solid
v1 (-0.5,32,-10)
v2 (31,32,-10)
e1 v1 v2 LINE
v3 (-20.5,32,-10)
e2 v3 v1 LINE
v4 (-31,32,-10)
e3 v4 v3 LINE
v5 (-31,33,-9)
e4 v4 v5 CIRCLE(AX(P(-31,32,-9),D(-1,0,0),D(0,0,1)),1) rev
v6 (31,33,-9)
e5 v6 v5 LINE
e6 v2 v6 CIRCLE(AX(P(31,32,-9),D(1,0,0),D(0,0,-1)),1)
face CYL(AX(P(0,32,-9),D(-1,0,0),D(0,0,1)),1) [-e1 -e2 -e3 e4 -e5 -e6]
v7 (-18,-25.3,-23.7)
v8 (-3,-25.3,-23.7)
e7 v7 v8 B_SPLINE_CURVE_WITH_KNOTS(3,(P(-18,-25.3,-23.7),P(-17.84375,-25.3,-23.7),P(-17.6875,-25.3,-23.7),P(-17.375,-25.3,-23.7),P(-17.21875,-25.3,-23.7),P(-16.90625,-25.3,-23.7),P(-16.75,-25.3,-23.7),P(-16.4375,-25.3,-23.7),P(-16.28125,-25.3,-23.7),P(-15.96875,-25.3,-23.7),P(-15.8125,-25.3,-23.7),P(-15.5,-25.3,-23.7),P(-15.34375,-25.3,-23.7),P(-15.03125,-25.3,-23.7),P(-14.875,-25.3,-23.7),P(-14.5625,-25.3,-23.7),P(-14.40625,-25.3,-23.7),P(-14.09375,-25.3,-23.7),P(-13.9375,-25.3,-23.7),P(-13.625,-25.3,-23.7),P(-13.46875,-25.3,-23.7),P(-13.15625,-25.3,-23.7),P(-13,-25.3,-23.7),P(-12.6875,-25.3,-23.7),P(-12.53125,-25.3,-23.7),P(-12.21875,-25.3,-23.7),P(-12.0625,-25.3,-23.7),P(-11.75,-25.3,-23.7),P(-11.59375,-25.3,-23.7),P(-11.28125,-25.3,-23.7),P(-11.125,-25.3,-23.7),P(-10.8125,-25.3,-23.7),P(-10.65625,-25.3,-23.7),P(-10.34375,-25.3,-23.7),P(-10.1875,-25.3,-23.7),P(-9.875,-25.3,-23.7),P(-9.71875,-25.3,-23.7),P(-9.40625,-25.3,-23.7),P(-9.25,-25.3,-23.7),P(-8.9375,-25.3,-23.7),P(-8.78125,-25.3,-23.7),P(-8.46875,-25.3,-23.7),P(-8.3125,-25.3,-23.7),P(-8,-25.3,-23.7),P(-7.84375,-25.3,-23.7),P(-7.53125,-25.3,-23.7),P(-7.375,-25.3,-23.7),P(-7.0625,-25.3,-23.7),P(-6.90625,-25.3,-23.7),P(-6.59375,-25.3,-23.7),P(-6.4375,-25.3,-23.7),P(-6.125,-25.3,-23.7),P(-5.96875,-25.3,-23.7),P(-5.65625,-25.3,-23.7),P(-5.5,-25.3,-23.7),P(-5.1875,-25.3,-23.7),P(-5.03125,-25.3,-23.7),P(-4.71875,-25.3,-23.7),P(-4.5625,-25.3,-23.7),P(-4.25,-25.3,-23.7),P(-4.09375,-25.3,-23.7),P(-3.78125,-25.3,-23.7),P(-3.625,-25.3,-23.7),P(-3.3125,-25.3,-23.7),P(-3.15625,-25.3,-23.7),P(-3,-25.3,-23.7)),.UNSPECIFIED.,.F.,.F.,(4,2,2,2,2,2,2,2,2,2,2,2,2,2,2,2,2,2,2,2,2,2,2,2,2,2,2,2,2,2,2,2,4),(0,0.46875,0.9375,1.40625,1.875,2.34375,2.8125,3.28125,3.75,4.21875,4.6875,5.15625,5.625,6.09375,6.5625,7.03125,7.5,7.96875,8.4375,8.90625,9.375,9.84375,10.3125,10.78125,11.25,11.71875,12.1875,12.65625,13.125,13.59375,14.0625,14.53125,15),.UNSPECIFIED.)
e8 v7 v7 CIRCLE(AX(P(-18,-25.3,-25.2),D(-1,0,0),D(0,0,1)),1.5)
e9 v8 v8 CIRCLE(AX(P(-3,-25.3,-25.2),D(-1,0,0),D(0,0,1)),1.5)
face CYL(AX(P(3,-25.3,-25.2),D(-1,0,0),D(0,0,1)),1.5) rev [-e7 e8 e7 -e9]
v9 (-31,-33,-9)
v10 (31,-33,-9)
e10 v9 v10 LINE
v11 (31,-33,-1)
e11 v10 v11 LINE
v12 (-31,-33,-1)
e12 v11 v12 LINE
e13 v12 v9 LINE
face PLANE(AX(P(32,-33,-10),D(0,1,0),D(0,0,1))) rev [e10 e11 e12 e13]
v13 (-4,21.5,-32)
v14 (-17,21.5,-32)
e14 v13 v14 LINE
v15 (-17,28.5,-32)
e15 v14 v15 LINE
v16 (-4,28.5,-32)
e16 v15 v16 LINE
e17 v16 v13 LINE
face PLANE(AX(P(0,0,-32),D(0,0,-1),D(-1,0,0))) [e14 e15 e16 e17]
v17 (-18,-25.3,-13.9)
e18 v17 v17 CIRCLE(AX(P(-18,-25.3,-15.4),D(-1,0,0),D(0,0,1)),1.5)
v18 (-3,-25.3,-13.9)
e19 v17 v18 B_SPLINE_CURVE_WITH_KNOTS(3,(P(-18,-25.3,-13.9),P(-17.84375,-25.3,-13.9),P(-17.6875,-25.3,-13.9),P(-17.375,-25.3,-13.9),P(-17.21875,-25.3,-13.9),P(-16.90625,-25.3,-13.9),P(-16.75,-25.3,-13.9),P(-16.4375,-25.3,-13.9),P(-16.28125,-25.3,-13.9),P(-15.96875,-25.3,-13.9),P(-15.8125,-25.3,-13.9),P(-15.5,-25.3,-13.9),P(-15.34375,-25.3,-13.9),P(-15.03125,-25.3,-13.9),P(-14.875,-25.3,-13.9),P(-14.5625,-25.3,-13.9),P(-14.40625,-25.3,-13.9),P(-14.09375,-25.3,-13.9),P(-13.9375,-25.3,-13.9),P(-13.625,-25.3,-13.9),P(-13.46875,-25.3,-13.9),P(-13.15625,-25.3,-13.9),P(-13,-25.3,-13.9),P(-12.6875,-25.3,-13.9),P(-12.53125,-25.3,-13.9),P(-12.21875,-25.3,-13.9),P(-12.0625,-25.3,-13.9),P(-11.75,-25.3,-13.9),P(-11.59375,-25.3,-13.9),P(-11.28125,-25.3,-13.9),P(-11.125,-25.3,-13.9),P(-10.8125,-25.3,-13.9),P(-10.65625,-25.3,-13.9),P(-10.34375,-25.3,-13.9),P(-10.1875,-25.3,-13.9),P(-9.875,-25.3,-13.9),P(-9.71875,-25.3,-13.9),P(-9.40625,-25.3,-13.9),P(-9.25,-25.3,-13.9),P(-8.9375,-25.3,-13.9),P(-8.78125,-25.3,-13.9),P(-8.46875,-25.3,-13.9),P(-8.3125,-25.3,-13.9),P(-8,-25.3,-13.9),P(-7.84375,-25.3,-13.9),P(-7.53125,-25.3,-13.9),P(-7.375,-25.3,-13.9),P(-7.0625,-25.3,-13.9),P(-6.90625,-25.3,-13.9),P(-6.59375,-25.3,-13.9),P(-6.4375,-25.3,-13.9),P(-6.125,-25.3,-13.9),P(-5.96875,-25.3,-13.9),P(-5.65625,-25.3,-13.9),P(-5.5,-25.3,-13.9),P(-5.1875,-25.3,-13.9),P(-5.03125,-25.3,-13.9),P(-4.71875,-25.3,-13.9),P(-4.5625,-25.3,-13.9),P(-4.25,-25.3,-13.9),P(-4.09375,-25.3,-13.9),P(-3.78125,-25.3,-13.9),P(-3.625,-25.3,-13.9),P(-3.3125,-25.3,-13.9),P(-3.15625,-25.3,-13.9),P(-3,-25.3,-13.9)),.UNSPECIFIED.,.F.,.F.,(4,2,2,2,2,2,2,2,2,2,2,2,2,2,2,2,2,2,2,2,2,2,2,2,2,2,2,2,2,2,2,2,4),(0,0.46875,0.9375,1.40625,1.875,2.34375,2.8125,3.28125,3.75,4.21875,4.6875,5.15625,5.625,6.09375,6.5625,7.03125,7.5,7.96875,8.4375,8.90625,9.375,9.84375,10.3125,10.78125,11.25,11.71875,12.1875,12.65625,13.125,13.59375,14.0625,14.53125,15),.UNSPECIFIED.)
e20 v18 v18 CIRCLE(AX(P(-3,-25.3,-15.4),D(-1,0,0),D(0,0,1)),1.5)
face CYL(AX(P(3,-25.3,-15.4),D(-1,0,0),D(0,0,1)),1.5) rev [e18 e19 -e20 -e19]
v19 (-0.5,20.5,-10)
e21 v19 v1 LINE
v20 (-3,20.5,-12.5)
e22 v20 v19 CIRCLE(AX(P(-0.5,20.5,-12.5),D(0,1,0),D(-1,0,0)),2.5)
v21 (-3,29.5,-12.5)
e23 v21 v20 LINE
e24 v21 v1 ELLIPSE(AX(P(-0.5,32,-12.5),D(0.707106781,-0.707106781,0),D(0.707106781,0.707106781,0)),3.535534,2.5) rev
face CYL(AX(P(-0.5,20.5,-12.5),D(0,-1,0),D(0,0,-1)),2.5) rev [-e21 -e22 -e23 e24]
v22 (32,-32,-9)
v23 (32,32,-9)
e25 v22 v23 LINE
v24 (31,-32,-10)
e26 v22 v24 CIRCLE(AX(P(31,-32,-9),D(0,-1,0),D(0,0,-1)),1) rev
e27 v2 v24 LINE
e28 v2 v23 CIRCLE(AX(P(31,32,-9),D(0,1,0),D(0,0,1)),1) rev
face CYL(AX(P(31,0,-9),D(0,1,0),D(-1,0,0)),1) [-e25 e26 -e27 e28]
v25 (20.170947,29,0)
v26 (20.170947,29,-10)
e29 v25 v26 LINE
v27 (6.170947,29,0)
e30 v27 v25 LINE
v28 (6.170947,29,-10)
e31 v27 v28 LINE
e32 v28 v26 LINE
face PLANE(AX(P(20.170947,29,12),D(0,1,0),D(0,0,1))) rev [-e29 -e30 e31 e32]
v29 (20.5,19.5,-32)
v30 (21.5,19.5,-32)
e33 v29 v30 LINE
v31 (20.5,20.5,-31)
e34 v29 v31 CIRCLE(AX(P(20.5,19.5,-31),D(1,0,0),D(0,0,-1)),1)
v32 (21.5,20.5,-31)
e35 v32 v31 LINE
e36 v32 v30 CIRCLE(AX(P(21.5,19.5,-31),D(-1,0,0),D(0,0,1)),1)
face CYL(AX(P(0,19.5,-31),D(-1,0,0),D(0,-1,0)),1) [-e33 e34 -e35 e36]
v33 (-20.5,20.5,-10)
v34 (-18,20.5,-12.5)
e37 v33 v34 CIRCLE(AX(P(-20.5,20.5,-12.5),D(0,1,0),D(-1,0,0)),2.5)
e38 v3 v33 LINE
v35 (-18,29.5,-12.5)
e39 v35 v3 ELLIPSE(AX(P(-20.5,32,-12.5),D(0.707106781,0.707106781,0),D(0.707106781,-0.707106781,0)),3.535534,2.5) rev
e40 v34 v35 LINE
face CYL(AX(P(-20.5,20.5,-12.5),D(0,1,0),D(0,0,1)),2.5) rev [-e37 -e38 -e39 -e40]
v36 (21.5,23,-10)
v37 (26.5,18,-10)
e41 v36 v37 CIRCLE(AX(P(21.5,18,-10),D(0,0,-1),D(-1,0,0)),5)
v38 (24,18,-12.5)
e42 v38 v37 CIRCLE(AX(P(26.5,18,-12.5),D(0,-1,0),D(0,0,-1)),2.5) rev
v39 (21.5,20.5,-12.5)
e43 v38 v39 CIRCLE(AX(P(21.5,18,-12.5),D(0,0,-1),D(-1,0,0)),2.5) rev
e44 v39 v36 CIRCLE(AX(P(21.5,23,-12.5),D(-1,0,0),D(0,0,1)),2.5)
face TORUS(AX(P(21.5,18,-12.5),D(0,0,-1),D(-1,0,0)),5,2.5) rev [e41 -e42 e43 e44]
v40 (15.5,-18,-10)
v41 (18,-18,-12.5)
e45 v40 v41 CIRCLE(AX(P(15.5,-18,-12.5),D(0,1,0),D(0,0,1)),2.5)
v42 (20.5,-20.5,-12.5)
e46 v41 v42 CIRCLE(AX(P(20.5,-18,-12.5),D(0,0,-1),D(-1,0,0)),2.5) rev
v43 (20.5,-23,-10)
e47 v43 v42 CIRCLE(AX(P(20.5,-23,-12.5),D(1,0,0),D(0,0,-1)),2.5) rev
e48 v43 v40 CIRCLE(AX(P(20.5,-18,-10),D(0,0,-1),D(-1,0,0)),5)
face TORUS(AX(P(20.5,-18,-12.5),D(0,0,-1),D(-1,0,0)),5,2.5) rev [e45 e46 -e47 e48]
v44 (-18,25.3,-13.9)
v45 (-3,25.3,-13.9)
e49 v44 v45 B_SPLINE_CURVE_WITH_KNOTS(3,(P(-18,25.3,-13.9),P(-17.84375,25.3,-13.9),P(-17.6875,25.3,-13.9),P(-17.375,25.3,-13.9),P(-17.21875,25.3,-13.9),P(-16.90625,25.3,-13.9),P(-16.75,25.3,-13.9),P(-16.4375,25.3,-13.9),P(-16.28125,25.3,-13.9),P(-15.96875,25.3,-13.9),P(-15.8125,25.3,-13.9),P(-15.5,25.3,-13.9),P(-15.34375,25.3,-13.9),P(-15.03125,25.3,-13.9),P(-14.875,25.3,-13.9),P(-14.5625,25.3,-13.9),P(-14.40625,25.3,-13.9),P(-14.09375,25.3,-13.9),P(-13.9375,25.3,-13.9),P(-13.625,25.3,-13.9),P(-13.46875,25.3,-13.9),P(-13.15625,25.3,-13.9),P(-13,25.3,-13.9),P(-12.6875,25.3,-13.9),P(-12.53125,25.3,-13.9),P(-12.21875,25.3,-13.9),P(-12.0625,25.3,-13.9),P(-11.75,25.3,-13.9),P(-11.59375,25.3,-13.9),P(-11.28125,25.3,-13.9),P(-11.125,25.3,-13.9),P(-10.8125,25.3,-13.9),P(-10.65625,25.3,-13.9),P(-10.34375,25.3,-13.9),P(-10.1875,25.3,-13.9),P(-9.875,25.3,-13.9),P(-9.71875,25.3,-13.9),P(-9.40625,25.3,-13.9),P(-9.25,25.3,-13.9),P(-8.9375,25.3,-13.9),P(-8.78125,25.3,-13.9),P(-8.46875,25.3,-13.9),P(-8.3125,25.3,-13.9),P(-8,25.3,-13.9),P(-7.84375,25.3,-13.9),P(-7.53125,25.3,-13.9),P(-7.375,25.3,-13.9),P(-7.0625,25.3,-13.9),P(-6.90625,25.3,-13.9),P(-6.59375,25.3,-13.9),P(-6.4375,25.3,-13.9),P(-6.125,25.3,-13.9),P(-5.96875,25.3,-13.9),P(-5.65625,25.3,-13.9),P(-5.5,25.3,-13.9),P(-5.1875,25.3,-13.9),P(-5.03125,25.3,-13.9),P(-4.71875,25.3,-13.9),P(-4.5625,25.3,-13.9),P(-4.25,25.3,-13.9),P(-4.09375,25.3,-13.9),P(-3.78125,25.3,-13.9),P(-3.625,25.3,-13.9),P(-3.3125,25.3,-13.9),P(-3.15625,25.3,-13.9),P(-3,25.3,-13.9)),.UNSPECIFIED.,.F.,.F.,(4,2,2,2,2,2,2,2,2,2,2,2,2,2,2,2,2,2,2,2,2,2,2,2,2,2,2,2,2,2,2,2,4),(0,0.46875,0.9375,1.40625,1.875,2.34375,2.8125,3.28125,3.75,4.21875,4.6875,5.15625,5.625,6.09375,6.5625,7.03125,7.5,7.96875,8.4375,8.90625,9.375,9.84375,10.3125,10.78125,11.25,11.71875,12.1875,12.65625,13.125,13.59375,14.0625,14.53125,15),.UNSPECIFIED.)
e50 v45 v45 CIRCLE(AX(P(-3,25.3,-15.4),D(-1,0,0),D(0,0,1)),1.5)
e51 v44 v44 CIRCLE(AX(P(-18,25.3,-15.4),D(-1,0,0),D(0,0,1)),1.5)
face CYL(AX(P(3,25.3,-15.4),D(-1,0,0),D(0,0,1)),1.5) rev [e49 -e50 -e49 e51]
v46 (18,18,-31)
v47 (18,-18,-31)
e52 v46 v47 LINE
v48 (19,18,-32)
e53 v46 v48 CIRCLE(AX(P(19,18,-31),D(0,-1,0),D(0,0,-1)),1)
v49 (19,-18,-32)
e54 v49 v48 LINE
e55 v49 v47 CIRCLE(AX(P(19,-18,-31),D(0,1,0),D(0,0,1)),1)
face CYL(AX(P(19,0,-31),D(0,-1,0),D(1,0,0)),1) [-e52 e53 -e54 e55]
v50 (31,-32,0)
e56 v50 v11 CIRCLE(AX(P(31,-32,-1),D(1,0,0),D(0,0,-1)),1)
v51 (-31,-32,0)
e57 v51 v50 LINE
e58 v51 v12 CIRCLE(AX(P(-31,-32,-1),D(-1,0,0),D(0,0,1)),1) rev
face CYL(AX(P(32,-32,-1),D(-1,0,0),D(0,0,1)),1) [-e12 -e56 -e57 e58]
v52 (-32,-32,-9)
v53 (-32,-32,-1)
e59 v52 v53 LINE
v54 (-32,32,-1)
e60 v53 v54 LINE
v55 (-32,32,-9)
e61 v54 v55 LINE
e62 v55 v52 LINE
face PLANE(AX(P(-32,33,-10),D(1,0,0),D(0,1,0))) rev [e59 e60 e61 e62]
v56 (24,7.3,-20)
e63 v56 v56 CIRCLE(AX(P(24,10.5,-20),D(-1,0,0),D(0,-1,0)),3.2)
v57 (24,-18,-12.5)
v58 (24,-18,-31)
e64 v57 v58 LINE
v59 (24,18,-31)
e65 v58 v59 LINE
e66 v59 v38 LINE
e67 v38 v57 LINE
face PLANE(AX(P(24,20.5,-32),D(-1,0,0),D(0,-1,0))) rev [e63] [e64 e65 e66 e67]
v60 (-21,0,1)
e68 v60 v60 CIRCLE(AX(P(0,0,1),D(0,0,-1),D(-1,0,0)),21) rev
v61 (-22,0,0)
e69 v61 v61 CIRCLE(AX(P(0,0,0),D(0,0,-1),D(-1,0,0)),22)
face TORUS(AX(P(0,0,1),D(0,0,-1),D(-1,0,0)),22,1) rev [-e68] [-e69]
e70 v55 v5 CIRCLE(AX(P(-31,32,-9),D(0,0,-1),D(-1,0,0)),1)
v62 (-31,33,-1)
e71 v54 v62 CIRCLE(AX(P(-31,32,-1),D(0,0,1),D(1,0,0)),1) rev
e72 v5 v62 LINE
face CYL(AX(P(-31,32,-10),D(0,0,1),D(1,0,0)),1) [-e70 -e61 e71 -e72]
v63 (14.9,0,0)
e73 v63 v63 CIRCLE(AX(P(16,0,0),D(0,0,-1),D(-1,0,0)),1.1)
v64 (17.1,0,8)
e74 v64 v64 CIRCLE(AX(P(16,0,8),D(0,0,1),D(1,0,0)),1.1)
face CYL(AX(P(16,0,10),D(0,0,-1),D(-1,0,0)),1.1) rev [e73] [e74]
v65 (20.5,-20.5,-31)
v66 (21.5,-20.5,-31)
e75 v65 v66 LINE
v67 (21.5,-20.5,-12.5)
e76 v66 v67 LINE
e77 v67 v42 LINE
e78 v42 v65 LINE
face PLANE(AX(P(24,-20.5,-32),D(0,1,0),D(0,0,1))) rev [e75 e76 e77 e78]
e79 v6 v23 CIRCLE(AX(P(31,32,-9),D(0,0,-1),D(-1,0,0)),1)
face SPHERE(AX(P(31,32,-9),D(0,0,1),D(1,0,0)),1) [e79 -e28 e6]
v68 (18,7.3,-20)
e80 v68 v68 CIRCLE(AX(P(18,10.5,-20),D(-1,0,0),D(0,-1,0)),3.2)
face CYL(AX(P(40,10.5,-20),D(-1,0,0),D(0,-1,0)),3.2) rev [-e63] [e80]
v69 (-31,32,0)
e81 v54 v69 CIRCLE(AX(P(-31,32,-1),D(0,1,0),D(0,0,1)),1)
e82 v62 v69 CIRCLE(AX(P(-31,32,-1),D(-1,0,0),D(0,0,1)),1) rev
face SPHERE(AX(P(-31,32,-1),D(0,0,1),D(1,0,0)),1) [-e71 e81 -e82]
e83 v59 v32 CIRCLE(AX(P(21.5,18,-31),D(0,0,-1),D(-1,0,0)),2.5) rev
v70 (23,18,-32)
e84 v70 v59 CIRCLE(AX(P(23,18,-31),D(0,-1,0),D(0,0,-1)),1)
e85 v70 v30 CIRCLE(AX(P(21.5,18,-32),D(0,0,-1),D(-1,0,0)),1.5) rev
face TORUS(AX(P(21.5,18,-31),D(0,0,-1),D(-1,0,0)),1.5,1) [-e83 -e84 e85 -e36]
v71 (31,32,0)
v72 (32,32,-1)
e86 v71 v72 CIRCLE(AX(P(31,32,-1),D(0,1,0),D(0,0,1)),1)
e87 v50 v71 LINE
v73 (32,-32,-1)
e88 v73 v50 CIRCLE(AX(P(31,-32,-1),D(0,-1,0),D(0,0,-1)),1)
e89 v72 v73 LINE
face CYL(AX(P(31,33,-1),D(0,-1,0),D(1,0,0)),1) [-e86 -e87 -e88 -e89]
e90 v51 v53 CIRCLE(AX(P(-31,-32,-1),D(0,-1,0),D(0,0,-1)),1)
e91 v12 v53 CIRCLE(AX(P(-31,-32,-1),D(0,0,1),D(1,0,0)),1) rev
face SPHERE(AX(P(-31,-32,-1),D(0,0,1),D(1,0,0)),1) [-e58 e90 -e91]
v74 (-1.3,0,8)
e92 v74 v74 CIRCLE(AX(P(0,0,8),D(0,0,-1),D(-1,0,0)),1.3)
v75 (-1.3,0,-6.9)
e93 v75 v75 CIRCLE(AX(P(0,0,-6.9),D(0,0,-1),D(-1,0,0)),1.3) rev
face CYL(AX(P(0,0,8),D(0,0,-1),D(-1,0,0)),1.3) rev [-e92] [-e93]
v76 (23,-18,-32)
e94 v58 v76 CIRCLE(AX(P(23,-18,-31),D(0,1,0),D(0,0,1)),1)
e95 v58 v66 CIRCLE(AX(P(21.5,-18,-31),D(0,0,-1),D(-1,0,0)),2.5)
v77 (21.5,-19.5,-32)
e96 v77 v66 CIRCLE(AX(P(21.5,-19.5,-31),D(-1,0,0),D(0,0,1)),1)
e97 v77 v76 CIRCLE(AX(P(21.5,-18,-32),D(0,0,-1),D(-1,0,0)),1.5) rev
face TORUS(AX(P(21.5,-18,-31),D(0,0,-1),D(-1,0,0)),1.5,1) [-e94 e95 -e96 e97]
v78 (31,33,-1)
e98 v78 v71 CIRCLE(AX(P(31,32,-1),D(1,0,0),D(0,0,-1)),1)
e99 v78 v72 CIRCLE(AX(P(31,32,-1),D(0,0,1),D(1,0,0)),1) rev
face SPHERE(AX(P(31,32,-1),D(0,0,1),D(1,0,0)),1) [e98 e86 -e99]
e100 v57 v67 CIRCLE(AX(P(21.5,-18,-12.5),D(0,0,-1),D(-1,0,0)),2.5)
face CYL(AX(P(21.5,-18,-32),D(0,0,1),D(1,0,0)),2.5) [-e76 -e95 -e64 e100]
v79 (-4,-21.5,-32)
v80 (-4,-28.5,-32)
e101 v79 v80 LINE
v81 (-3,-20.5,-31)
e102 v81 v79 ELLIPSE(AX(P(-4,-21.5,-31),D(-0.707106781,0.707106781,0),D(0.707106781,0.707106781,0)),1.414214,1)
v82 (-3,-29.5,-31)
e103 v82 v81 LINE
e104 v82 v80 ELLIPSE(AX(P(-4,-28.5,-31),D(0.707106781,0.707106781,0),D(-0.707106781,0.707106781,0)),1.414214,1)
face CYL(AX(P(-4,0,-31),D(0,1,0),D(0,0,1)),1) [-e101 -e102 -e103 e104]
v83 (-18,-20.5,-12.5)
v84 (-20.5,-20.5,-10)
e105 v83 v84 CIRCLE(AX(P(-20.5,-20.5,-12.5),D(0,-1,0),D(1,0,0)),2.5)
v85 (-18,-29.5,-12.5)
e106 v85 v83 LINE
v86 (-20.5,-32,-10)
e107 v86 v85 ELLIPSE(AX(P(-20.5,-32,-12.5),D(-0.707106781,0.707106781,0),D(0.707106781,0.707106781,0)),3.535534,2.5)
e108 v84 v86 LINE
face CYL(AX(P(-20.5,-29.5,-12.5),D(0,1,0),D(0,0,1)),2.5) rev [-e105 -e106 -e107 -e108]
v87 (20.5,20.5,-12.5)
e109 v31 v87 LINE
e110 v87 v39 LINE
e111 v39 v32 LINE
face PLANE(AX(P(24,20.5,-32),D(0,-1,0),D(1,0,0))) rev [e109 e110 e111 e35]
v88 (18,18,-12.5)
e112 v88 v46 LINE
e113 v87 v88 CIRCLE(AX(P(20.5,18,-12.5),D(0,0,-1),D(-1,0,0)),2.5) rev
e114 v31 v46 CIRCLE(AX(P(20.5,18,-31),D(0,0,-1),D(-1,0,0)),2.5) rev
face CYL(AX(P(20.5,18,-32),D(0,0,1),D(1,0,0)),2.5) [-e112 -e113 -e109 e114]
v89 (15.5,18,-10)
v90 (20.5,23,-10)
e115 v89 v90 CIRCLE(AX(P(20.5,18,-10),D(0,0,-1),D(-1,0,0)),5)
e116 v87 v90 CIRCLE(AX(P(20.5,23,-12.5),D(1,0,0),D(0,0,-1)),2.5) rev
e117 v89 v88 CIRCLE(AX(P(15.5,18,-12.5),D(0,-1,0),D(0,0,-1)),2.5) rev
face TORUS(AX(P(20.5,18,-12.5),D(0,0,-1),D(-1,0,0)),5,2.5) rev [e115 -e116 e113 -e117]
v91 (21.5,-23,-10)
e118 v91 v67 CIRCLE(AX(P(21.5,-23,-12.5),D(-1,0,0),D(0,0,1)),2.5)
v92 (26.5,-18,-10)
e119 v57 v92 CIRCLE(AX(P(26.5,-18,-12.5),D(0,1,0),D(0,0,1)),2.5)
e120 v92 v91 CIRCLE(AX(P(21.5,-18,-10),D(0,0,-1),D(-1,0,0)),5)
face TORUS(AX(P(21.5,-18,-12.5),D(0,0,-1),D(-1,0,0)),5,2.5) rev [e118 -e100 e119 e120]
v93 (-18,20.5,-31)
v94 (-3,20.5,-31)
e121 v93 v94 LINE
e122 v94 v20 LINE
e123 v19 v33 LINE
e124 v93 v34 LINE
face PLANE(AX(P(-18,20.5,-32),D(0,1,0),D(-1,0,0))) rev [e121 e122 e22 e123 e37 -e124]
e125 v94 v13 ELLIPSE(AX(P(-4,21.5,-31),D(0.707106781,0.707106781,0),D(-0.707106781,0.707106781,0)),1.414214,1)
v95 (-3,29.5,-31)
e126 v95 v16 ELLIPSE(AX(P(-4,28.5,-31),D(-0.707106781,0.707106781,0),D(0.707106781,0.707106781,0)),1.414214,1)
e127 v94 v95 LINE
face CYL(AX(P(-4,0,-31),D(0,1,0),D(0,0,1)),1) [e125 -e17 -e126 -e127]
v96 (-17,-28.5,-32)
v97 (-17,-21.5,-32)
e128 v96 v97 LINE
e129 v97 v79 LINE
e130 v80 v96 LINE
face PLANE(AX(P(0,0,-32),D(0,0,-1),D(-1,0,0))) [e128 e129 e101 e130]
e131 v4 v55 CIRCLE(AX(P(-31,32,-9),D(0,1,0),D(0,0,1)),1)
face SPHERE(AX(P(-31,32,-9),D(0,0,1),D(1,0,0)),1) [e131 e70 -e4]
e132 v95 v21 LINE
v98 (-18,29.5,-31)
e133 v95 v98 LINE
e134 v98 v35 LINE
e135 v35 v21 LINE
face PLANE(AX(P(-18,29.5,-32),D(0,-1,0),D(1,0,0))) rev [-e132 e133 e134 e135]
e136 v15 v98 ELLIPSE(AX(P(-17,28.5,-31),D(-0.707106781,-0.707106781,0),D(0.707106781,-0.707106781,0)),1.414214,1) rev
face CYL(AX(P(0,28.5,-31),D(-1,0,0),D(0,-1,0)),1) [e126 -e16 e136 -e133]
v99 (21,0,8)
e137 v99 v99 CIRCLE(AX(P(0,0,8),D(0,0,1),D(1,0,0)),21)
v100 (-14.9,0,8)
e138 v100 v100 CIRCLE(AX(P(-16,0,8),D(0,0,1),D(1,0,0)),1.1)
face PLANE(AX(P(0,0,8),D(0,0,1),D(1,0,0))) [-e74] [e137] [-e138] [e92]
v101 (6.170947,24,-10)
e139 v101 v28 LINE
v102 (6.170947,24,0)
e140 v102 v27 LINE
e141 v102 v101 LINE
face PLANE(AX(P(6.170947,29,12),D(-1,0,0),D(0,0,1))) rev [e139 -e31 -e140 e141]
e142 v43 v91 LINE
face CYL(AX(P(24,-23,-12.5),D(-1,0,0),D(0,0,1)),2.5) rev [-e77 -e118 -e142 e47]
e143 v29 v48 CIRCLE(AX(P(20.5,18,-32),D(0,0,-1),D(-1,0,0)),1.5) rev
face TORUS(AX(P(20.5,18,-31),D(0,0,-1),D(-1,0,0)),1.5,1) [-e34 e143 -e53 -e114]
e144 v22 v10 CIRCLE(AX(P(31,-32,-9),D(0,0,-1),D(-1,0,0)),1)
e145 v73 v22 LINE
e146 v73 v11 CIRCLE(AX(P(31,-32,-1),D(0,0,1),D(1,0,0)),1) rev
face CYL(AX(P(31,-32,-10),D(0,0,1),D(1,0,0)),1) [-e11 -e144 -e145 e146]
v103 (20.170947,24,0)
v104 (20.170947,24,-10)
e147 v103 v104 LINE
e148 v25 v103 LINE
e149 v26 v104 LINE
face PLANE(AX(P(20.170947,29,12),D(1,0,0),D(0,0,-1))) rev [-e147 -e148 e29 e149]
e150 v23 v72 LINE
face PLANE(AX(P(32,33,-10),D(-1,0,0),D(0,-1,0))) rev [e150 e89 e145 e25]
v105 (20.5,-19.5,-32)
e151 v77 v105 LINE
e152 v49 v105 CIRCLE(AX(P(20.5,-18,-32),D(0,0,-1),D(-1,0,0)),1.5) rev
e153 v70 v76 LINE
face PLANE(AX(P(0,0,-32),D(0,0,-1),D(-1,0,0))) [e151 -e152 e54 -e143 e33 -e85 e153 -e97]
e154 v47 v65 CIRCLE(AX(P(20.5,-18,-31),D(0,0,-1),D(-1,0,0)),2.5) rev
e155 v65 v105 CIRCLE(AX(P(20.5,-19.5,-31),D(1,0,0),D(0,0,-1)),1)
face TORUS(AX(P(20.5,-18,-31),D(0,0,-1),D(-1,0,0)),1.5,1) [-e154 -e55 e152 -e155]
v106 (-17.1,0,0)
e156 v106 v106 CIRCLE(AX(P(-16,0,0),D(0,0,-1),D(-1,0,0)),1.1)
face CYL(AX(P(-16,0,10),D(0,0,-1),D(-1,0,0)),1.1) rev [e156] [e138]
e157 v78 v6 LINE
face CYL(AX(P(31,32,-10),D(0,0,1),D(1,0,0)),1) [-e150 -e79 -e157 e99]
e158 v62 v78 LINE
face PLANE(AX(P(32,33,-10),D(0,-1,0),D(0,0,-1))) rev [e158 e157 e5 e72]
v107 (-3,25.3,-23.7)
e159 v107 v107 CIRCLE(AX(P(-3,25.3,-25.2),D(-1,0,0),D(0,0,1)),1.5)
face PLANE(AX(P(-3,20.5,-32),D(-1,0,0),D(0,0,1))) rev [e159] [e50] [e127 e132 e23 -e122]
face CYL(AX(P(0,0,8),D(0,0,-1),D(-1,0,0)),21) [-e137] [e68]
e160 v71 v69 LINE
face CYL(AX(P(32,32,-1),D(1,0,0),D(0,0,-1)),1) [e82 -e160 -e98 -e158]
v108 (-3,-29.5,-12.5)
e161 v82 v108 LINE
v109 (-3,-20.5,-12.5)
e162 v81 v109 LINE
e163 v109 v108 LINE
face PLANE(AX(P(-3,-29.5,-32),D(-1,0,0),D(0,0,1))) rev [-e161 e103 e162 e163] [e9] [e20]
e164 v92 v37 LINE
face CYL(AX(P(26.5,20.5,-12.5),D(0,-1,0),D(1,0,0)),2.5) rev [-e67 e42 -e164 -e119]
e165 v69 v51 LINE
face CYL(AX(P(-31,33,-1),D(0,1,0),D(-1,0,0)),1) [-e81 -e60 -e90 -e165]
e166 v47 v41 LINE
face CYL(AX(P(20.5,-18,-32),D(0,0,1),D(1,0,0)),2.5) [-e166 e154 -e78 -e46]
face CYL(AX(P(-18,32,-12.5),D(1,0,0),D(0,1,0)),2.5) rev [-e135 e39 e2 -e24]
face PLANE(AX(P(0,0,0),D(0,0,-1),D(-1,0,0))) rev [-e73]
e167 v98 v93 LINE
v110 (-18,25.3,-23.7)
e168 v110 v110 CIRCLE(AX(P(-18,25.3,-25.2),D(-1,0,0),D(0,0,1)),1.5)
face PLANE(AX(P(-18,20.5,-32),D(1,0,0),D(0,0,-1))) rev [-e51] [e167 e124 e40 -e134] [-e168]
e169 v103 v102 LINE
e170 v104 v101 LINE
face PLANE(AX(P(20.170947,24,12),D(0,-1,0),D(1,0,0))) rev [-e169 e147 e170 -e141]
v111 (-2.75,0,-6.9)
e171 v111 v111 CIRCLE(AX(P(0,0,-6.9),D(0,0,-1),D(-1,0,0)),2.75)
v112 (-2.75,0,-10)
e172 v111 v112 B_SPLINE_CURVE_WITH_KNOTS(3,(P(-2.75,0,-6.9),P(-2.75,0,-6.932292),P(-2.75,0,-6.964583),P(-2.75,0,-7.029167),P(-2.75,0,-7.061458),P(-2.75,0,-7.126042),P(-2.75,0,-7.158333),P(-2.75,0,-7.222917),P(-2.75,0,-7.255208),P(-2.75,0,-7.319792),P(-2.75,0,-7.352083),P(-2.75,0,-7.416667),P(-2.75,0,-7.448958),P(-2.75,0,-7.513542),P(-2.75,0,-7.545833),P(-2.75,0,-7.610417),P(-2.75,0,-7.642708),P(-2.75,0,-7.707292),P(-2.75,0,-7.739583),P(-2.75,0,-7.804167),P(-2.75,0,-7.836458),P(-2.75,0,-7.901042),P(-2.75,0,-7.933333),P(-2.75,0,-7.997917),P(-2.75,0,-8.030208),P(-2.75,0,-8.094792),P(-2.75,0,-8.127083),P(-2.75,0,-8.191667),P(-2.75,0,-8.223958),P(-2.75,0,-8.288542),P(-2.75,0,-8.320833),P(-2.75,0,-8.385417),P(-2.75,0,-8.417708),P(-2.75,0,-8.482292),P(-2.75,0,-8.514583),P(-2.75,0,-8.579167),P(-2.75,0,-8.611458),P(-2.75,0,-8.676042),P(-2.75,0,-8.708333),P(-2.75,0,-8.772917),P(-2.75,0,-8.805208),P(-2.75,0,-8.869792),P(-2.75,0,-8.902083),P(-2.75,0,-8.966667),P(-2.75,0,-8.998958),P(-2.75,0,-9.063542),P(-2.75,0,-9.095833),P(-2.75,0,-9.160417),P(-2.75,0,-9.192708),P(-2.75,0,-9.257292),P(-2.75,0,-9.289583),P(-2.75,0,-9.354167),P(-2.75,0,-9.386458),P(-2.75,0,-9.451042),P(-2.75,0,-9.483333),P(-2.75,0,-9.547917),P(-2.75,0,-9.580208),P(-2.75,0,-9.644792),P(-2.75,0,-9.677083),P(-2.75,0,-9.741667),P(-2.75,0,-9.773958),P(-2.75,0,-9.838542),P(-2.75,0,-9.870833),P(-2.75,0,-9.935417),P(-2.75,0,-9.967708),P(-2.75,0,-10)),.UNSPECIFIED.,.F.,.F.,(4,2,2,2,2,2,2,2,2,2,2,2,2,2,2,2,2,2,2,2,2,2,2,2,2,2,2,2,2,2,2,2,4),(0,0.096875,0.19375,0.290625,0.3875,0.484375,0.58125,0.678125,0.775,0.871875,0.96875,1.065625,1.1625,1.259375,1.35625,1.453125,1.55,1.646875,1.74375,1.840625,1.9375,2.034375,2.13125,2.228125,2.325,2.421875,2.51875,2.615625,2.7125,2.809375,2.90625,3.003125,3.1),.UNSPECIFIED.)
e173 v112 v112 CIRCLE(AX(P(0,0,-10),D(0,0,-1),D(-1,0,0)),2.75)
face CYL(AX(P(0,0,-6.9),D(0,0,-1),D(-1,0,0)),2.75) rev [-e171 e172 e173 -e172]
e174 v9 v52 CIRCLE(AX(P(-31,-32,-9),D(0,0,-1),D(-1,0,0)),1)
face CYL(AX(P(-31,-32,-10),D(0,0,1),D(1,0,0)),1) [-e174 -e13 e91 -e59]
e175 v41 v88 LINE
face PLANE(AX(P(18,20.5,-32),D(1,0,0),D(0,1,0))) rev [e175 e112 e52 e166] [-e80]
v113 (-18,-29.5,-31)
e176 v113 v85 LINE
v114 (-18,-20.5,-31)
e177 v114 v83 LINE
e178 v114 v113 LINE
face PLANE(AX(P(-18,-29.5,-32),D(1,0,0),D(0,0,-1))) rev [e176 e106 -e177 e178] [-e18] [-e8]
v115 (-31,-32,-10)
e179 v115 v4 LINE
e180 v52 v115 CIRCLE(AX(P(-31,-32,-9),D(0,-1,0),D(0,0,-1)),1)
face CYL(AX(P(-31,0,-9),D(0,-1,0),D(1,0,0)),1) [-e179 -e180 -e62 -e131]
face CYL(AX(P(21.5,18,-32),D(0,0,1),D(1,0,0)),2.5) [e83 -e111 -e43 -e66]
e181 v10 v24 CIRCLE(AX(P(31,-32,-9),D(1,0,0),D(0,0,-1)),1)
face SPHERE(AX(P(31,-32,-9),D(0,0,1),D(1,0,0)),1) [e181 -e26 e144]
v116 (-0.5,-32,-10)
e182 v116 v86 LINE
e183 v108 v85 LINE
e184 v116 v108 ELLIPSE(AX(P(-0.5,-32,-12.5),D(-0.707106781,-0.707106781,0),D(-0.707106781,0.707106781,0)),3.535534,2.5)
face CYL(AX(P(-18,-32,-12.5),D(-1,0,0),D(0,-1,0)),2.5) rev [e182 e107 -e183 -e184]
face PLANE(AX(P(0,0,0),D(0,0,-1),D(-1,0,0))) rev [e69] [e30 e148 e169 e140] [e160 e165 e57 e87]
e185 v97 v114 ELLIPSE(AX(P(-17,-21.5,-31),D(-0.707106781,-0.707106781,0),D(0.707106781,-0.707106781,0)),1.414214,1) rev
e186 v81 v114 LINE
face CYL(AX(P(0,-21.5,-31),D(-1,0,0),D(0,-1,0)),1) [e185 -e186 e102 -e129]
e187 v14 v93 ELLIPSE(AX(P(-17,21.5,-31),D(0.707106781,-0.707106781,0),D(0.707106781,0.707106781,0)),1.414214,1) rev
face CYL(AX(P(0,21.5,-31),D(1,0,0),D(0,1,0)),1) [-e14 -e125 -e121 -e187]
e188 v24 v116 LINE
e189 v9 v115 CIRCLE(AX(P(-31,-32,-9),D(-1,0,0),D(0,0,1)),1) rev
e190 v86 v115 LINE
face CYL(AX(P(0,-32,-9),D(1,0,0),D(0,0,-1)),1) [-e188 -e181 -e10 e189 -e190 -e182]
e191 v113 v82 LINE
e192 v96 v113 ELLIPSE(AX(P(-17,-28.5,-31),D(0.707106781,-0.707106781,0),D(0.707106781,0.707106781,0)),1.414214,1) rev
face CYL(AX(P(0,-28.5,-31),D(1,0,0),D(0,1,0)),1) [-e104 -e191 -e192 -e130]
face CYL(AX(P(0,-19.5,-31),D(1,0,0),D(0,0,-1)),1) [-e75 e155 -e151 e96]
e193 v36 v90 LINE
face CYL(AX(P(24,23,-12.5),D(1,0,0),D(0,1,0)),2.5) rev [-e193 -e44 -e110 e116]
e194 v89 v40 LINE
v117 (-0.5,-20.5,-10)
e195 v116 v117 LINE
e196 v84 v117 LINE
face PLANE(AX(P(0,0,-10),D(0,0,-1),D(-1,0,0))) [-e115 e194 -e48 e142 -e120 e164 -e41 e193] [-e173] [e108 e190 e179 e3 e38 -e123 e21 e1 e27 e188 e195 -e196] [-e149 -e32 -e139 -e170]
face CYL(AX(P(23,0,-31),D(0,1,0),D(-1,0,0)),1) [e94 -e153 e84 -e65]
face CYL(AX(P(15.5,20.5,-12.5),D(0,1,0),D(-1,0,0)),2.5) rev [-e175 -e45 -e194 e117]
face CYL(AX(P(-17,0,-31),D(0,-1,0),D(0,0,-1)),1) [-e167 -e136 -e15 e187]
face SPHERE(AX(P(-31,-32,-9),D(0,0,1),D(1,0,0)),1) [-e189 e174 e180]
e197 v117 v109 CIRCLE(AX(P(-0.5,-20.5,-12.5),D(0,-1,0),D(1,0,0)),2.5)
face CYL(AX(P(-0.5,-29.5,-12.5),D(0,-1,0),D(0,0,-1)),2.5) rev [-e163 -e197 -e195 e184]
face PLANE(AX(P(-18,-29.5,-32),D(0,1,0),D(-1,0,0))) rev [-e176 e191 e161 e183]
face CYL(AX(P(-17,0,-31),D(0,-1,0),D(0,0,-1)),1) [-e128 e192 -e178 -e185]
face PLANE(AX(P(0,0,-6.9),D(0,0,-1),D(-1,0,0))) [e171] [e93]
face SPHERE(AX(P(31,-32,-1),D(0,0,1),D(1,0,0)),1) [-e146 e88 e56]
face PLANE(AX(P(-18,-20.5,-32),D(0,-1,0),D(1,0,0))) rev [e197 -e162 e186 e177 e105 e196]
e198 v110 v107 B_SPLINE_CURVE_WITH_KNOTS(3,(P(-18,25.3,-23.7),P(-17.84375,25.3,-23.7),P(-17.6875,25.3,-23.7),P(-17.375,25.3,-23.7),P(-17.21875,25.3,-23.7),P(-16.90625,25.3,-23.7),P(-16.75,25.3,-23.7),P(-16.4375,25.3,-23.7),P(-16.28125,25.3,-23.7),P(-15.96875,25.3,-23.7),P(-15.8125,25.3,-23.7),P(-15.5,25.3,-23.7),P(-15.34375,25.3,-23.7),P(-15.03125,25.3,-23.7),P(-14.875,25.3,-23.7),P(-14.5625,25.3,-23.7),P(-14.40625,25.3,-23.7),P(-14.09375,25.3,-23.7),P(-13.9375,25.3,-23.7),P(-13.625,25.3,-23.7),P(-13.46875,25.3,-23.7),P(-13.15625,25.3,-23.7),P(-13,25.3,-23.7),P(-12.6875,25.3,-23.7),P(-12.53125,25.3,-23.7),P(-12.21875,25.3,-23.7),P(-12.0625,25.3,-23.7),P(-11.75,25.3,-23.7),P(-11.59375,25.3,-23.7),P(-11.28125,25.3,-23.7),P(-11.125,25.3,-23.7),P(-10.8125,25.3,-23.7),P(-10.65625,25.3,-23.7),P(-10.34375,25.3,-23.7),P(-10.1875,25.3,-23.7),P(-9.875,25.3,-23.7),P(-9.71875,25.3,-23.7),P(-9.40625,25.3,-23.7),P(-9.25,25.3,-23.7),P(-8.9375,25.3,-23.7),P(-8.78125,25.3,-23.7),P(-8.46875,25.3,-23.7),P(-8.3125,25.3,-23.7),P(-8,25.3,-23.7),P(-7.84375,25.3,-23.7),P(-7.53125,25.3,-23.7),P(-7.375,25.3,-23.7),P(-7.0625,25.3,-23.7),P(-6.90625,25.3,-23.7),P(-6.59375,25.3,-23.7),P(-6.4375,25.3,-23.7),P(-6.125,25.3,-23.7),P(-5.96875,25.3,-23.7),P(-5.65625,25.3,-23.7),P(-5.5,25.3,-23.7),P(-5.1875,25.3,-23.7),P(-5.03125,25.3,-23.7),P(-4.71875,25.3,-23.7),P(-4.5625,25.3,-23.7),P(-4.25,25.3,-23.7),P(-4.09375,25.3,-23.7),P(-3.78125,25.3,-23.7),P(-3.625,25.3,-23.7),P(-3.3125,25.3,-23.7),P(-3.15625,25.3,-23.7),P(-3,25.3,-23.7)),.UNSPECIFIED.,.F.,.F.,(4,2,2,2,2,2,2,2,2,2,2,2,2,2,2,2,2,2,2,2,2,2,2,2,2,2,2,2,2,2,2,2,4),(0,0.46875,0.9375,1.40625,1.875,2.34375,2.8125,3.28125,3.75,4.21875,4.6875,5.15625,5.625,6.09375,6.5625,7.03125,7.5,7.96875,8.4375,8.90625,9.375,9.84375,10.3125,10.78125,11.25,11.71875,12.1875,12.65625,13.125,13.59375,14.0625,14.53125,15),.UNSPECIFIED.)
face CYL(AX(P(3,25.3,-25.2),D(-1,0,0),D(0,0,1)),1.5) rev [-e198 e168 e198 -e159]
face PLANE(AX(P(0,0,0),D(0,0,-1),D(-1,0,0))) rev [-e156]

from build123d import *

# Parameters (mm, degrees)
SKETCH1_R               = 21
BOSS_EXTRUDE1_DEPTH     = 8
CUT_EXTRUDE1_DEPTH      = 31.757112998
CUT_EXTRUDE1_DEPTH_BACK = 31.757112998
SKETCH2_R               = 1.3
SKETCH4_R               = 1.1
CUT_EXTRUDE2_DEPTH      = 10
SKETCH5_R               = 1.1
CUT_EXTRUDE3_DEPTH      = 10
SKETCH11_W              = 64
SKETCH11_H              = 66
BOSS_EXTRUDE3_DEPTH     = 10
CUT_EXTRUDE8_START      = -10
SKETCH17_R              = 1.3
CUT_EXTRUDE8_DEPTH      = 10
SKETCH12_W              = 15
SKETCH12_H              = 9
BOSS_EXTRUDE4_DEPTH     = 22
SKETCH13_R              = 1.5
CUT_EXTRUDE4_DEPTH      = 21
SKETCH14_W              = 6
SKETCH14_H              = 41
BOSS_EXTRUDE5_DEPTH     = 22
SKETCH15_R              = 3.2
CUT_EXTRUDE6_DEPTH      = 22
FILLET12_R              = 1
FILLET13_R              = 1
FILLET14_R              = 2.5
SKETCH16_W              = 14
SKETCH16_H              = 5
CUT_EXTRUDE7_DEPTH      = 22
FILLET15_R              = 2.5
SKETCH18_R              = 2.75
CUT_EXTRUDE9_DEPTH      = 3.1


# Some blends are built 0.0001 mm under size
with BuildPart() as part:
    # Sketch1 → Boss-Extrude1 (new body)
    with BuildSketch(Plane.XY):
        Circle(SKETCH1_R)
    extrude(amount=BOSS_EXTRUDE1_DEPTH)

    # Sketch2 → Cut-Extrude1 (cut, two sides: drawn at the far end of the back side and taken through both)
    with BuildSketch(Plane(origin=(0, 0, 0), x_dir=(-1, 0, 0), z_dir=(0, 0, -1)).offset(-CUT_EXTRUDE1_DEPTH_BACK)):
        Circle(SKETCH2_R)
    extrude(amount=CUT_EXTRUDE1_DEPTH + CUT_EXTRUDE1_DEPTH_BACK, mode=Mode.SUBTRACT)

    # Sketch4 → Cut-Extrude2 (cut)
    with BuildSketch(Plane(origin=(0, 0, 0), x_dir=(-1, 0, 0), z_dir=(0, 0, -1))):
        with Locations((16, 0)):
            Circle(SKETCH4_R)
    extrude(amount=-CUT_EXTRUDE2_DEPTH, mode=Mode.SUBTRACT)

    # Sketch5 → Cut-Extrude3 (cut)
    with BuildSketch(Plane(origin=(0, 0, 0), x_dir=(-1, 0, 0), z_dir=(0, 0, -1))):
        with Locations((-16, 0)):
            Circle(SKETCH5_R)
    extrude(amount=-CUT_EXTRUDE3_DEPTH, mode=Mode.SUBTRACT)

    # Sketch11 → Boss-Extrude3 (add)
    with BuildSketch(Plane(origin=(0, 0, 0), x_dir=(-1, 0, 0), z_dir=(0, 0, -1))):
        Rectangle(SKETCH11_W, SKETCH11_H)
    extrude(amount=BOSS_EXTRUDE3_DEPTH)

    # Sketch17 → Cut-Extrude8 (cut)
    with BuildSketch(Plane.XY.offset(CUT_EXTRUDE8_START)):
        with Locations(Location((0, 0, 0), (0, 0, 180))):
            Circle(SKETCH17_R)
    extrude(amount=CUT_EXTRUDE8_DEPTH, mode=Mode.SUBTRACT)

    # Sketch12 → Boss-Extrude4 (add)
    with BuildSketch(Plane(origin=(0, 0, -10), x_dir=(-1, 0, 0), z_dir=(0, 0, -1))):
        with Locations((10.5, -25)):
            Rectangle(SKETCH12_W, SKETCH12_H)
        with Locations((10.5, 25)):
            Rectangle(SKETCH12_W, SKETCH12_H)
    extrude(amount=BOSS_EXTRUDE4_DEPTH)

    # Sketch13 → Cut-Extrude4 (cut)
    with BuildSketch(Plane.ZY.offset(18)):
        with Locations((-25.2, -25.3)):
            Circle(SKETCH13_R)
        with Locations((-15.4, -25.3)):
            Circle(SKETCH13_R)
        with Locations((-25.2, 25.3)):
            Circle(SKETCH13_R)
        with Locations((-15.4, 25.3)):
            Circle(SKETCH13_R)
    extrude(amount=-CUT_EXTRUDE4_DEPTH, mode=Mode.SUBTRACT)

    # Sketch14 → Boss-Extrude5 (add)
    with BuildSketch(Plane(origin=(0, 0, -10), x_dir=(-1, 0, 0), z_dir=(0, 0, -1))):
        with Locations((-21, 0)):
            Rectangle(SKETCH14_W, SKETCH14_H)
    extrude(amount=BOSS_EXTRUDE5_DEPTH)

    # Sketch15 → Cut-Extrude6 (cut)
    with BuildSketch(Plane.ZY.offset(-18)):
        with Locations(Location((-20, 10.5, 0), (0, 0, 270))):
            Circle(SKETCH15_R)
    extrude(amount=-CUT_EXTRUDE6_DEPTH, mode=Mode.SUBTRACT)

    # Fillet12
    fillet12_edges = [part.edges().sort_by_distance(p)[0] for p in [
        (-21, 0, 0),
        (-32, 0, 0),
        (-32, -33, -5),
        (0, 33, 0),
        (-32, 33, -5),
        (32, 0, 0),
        (32, 33, -5),
        (0, -33, 0),
        (32, -33, -5),
        (-32, 0, -10),
        (0, 33, -10),
        (32, 0, -10),
        (0, -33, -10),
    ]]
    fillet(fillet12_edges, radius=FILLET12_R)

    # Fillet13
    fillet13_edges = [part.edges().sort_by_distance(p)[0] for p in [
        (-3, -25, -32),
        (-10.5, -29.5, -32),
        (-18, -25, -32),
        (-10.5, -20.5, -32),
        (-3, 25, -32),
        (-10.5, 20.5, -32),
        (-18, 25, -32),
        (-10.5, 29.5, -32),
        (18, 0, -32),
        (21, 20.5, -32),
        (24, 0, -32),
        (21, -20.5, -32),
    ]]
    fillet(fillet13_edges, radius=FILLET13_R)

    # Fillet14
    # the kernel refuses this fillet: 2.5 mm, written as the material it takes off along each edge
    with BuildSketch(Plane(origin=(21.5, 18, -32), x_dir=(0, 1, 0), z_dir=(-1, 0, 0))) as fillet14_piece_1:
        with BuildLine():
            CenterArc((1.5, -1), 1, 0, 90)
            Line((2.5, -1), (2.5, 0))
            Line((2.5, 0), (1.5, 0))
        make_face()
    revolve(axis=Axis((21.5, 18, -32), (0, 0, -1)), revolution_arc=90, mode=Mode.SUBTRACT)
    with BuildSketch(Plane(origin=(20.5, 18, -32), x_dir=(-1, 0, 0), z_dir=(0, -1, 0))) as fillet14_piece_2:
        with BuildLine():
            CenterArc((1.5, -1), 1, 0, 90)
            Line((2.5, -1), (2.5, 0))
            Line((2.5, 0), (1.5, 0))
        make_face()
    revolve(axis=Axis((20.5, 18, -32), (0, 0, -1)), revolution_arc=90, mode=Mode.SUBTRACT)
    with BuildSketch(Plane(origin=(21.5, -18, -32), x_dir=(1, 0, 0), z_dir=(0, 1, 0))) as fillet14_piece_3:
        with BuildLine():
            CenterArc((1.5, -1), 1, 0, 90)
            Line((2.5, -1), (2.5, 0))
            Line((2.5, 0), (1.5, 0))
        make_face()
    revolve(axis=Axis((21.5, -18, -32), (0, 0, -1)), revolution_arc=90, mode=Mode.SUBTRACT)
    with BuildSketch(Plane(origin=(20.5, -18, -32), x_dir=(0, -1, 0), z_dir=(1, 0, 0))) as fillet14_piece_4:
        with BuildLine():
            CenterArc((1.5, -1), 1, 0, 90)
            Line((2.5, -1), (2.5, 0))
            Line((2.5, 0), (1.5, 0))
        make_face()
    revolve(axis=Axis((20.5, -18, -32), (0, 0, -1)), revolution_arc=90, mode=Mode.SUBTRACT)
    with BuildSketch(Plane(origin=(18, -20.5, -10), x_dir=(0, 1, 0), z_dir=(0, 0, -1)), Plane(origin=(24, -20.5, -10), x_dir=(-1, 0, 0), z_dir=(0, 0, -1)), Plane(origin=(18, 20.5, -10), x_dir=(1, 0, 0), z_dir=(0, 0, -1))) as fillet14_piece_5:
        with BuildLine():
            CenterArc((FILLET14_R, FILLET14_R), FILLET14_R, 180, 90)
            Line((0, FILLET14_R), (0, 0))
            Line((0, 0), (FILLET14_R, 0))
        make_face()
    extrude(amount=22, mode=Mode.SUBTRACT)
    with BuildSketch(Plane(origin=(24, 20.5, -10), x_dir=(-1, 0, 0), z_dir=(0, 0, -1))) as fillet14_piece_6:
        with BuildLine():
            CenterArc((FILLET14_R, -FILLET14_R), FILLET14_R, 90, 90)
            Line((0, -FILLET14_R), (0, 0))
            Line((0, 0), (FILLET14_R, 0))
        make_face()
    extrude(amount=22, mode=Mode.SUBTRACT)
    # the kernel refuses this fillet: 2.5 mm, written as the material it adds along each edge
    with BuildSketch(Plane(origin=(18, 18, -10), x_dir=(-1, 0, 0), z_dir=(0, -1, 0)), Plane(origin=(24, -18, -10), x_dir=(1, 0, 0), z_dir=(0, 1, 0))) as fillet14_2_piece_1:
        with BuildLine():
            CenterArc((FILLET14_R, FILLET14_R), FILLET14_R, 180, 90)
            Line((0, FILLET14_R), (0, 0))
            Line((0, 0), (FILLET14_R, 0))
        make_face()
    extrude(amount=36)
    with BuildSketch(Plane(origin=(21.5, 20.5, -10), x_dir=(0, 1, 0), z_dir=(-1, 0, 0)), Plane(origin=(20.5, -20.5, -10), x_dir=(0, -1, 0), z_dir=(1, 0, 0))) as fillet14_2_piece_2:
        with BuildLine():
            CenterArc((FILLET14_R, FILLET14_R), FILLET14_R, 180, 90)
            Line((0, FILLET14_R), (0, 0))
            Line((0, 0), (FILLET14_R, 0))
        make_face()
    extrude(amount=1)
    with BuildSketch(Plane(origin=(20.5, -18, -10), x_dir=(-1, 0, 0), z_dir=(0, 1, 0))) as fillet14_2_piece_3:
        with BuildLine():
            CenterArc((2.5 + FILLET14_R, -FILLET14_R), FILLET14_R, 90, 90)
            Line((2.5, -FILLET14_R), (2.5, 0))
            Line((2.5, 0), (2.5 + FILLET14_R, 0))
        make_face()
    revolve(axis=Axis((20.5, -18, -10), (0, 0, 1)), revolution_arc=90)
    with BuildSketch(Plane(origin=(21.5, -18, -10), x_dir=(0, -1, 0), z_dir=(-1, 0, 0))) as fillet14_2_piece_4:
        with BuildLine():
            CenterArc((2.5 + FILLET14_R, -FILLET14_R), FILLET14_R, 90, 90)
            Line((2.5, -FILLET14_R), (2.5, 0))
            Line((2.5, 0), (2.5 + FILLET14_R, 0))
        make_face()
    revolve(axis=Axis((21.5, -18, -10), (0, 0, 1)), revolution_arc=90)
    with BuildSketch(Plane(origin=(21.5, 18, -10), x_dir=(0, 1, 0), z_dir=(-1, 0, 0))) as fillet14_2_piece_5:
        with BuildLine():
            CenterArc((2.5 + FILLET14_R, FILLET14_R), FILLET14_R, 180, 90)
            Line((2.5, FILLET14_R), (2.5, 0))
            Line((2.5, 0), (2.5 + FILLET14_R, 0))
        make_face()
    revolve(axis=Axis((21.5, 18, -10), (0, 0, -1)), revolution_arc=90)
    with BuildSketch(Plane(origin=(20.5, 18, -10), x_dir=(0, 1, 0), z_dir=(1, 0, 0))) as fillet14_2_piece_6:
        with BuildLine():
            CenterArc((2.5 + FILLET14_R, -FILLET14_R), FILLET14_R, 90, 90)
            Line((2.5, -FILLET14_R), (2.5, 0))
            Line((2.5, 0), (2.5 + FILLET14_R, 0))
        make_face()
    revolve(axis=Axis((20.5, 18, -10), (0, 0, 1)), revolution_arc=90)

    # Sketch16 → Cut-Extrude7 (cut)
    with BuildSketch(Plane(origin=(0, 0, -10), x_dir=(-1, 0, 0), z_dir=(0, 0, -1))):
        with Locations((-13.170947401, 26.5)):
            Rectangle(SKETCH16_W, SKETCH16_H)
    extrude(amount=-CUT_EXTRUDE7_DEPTH, mode=Mode.SUBTRACT)

    # Fillet15
    fillet15_edges = [part.edges().sort_by_distance(p)[0] for p in [
        (-3, -25, -10),
        (-10.5, -29.5, -10),
        (-18, -25, -10),
        (-3, 25, -10),
        (-18, 25, -10),
        (-10.5, 29.5, -10),
    ]]
    fillet(fillet15_edges, radius=FILLET15_R - 0.0001)  # a hair under: the kernel refuses the full size

    # Sketch18 → Cut-Extrude9 (cut)
    with BuildSketch(Plane(origin=(0, 0, -10), x_dir=(-1, 0, 0), z_dir=(0, 0, -1))):
        Circle(SKETCH18_R)
    extrude(amount=-CUT_EXTRUDE9_DEPTH, mode=Mode.SUBTRACT)


solid = part.part
